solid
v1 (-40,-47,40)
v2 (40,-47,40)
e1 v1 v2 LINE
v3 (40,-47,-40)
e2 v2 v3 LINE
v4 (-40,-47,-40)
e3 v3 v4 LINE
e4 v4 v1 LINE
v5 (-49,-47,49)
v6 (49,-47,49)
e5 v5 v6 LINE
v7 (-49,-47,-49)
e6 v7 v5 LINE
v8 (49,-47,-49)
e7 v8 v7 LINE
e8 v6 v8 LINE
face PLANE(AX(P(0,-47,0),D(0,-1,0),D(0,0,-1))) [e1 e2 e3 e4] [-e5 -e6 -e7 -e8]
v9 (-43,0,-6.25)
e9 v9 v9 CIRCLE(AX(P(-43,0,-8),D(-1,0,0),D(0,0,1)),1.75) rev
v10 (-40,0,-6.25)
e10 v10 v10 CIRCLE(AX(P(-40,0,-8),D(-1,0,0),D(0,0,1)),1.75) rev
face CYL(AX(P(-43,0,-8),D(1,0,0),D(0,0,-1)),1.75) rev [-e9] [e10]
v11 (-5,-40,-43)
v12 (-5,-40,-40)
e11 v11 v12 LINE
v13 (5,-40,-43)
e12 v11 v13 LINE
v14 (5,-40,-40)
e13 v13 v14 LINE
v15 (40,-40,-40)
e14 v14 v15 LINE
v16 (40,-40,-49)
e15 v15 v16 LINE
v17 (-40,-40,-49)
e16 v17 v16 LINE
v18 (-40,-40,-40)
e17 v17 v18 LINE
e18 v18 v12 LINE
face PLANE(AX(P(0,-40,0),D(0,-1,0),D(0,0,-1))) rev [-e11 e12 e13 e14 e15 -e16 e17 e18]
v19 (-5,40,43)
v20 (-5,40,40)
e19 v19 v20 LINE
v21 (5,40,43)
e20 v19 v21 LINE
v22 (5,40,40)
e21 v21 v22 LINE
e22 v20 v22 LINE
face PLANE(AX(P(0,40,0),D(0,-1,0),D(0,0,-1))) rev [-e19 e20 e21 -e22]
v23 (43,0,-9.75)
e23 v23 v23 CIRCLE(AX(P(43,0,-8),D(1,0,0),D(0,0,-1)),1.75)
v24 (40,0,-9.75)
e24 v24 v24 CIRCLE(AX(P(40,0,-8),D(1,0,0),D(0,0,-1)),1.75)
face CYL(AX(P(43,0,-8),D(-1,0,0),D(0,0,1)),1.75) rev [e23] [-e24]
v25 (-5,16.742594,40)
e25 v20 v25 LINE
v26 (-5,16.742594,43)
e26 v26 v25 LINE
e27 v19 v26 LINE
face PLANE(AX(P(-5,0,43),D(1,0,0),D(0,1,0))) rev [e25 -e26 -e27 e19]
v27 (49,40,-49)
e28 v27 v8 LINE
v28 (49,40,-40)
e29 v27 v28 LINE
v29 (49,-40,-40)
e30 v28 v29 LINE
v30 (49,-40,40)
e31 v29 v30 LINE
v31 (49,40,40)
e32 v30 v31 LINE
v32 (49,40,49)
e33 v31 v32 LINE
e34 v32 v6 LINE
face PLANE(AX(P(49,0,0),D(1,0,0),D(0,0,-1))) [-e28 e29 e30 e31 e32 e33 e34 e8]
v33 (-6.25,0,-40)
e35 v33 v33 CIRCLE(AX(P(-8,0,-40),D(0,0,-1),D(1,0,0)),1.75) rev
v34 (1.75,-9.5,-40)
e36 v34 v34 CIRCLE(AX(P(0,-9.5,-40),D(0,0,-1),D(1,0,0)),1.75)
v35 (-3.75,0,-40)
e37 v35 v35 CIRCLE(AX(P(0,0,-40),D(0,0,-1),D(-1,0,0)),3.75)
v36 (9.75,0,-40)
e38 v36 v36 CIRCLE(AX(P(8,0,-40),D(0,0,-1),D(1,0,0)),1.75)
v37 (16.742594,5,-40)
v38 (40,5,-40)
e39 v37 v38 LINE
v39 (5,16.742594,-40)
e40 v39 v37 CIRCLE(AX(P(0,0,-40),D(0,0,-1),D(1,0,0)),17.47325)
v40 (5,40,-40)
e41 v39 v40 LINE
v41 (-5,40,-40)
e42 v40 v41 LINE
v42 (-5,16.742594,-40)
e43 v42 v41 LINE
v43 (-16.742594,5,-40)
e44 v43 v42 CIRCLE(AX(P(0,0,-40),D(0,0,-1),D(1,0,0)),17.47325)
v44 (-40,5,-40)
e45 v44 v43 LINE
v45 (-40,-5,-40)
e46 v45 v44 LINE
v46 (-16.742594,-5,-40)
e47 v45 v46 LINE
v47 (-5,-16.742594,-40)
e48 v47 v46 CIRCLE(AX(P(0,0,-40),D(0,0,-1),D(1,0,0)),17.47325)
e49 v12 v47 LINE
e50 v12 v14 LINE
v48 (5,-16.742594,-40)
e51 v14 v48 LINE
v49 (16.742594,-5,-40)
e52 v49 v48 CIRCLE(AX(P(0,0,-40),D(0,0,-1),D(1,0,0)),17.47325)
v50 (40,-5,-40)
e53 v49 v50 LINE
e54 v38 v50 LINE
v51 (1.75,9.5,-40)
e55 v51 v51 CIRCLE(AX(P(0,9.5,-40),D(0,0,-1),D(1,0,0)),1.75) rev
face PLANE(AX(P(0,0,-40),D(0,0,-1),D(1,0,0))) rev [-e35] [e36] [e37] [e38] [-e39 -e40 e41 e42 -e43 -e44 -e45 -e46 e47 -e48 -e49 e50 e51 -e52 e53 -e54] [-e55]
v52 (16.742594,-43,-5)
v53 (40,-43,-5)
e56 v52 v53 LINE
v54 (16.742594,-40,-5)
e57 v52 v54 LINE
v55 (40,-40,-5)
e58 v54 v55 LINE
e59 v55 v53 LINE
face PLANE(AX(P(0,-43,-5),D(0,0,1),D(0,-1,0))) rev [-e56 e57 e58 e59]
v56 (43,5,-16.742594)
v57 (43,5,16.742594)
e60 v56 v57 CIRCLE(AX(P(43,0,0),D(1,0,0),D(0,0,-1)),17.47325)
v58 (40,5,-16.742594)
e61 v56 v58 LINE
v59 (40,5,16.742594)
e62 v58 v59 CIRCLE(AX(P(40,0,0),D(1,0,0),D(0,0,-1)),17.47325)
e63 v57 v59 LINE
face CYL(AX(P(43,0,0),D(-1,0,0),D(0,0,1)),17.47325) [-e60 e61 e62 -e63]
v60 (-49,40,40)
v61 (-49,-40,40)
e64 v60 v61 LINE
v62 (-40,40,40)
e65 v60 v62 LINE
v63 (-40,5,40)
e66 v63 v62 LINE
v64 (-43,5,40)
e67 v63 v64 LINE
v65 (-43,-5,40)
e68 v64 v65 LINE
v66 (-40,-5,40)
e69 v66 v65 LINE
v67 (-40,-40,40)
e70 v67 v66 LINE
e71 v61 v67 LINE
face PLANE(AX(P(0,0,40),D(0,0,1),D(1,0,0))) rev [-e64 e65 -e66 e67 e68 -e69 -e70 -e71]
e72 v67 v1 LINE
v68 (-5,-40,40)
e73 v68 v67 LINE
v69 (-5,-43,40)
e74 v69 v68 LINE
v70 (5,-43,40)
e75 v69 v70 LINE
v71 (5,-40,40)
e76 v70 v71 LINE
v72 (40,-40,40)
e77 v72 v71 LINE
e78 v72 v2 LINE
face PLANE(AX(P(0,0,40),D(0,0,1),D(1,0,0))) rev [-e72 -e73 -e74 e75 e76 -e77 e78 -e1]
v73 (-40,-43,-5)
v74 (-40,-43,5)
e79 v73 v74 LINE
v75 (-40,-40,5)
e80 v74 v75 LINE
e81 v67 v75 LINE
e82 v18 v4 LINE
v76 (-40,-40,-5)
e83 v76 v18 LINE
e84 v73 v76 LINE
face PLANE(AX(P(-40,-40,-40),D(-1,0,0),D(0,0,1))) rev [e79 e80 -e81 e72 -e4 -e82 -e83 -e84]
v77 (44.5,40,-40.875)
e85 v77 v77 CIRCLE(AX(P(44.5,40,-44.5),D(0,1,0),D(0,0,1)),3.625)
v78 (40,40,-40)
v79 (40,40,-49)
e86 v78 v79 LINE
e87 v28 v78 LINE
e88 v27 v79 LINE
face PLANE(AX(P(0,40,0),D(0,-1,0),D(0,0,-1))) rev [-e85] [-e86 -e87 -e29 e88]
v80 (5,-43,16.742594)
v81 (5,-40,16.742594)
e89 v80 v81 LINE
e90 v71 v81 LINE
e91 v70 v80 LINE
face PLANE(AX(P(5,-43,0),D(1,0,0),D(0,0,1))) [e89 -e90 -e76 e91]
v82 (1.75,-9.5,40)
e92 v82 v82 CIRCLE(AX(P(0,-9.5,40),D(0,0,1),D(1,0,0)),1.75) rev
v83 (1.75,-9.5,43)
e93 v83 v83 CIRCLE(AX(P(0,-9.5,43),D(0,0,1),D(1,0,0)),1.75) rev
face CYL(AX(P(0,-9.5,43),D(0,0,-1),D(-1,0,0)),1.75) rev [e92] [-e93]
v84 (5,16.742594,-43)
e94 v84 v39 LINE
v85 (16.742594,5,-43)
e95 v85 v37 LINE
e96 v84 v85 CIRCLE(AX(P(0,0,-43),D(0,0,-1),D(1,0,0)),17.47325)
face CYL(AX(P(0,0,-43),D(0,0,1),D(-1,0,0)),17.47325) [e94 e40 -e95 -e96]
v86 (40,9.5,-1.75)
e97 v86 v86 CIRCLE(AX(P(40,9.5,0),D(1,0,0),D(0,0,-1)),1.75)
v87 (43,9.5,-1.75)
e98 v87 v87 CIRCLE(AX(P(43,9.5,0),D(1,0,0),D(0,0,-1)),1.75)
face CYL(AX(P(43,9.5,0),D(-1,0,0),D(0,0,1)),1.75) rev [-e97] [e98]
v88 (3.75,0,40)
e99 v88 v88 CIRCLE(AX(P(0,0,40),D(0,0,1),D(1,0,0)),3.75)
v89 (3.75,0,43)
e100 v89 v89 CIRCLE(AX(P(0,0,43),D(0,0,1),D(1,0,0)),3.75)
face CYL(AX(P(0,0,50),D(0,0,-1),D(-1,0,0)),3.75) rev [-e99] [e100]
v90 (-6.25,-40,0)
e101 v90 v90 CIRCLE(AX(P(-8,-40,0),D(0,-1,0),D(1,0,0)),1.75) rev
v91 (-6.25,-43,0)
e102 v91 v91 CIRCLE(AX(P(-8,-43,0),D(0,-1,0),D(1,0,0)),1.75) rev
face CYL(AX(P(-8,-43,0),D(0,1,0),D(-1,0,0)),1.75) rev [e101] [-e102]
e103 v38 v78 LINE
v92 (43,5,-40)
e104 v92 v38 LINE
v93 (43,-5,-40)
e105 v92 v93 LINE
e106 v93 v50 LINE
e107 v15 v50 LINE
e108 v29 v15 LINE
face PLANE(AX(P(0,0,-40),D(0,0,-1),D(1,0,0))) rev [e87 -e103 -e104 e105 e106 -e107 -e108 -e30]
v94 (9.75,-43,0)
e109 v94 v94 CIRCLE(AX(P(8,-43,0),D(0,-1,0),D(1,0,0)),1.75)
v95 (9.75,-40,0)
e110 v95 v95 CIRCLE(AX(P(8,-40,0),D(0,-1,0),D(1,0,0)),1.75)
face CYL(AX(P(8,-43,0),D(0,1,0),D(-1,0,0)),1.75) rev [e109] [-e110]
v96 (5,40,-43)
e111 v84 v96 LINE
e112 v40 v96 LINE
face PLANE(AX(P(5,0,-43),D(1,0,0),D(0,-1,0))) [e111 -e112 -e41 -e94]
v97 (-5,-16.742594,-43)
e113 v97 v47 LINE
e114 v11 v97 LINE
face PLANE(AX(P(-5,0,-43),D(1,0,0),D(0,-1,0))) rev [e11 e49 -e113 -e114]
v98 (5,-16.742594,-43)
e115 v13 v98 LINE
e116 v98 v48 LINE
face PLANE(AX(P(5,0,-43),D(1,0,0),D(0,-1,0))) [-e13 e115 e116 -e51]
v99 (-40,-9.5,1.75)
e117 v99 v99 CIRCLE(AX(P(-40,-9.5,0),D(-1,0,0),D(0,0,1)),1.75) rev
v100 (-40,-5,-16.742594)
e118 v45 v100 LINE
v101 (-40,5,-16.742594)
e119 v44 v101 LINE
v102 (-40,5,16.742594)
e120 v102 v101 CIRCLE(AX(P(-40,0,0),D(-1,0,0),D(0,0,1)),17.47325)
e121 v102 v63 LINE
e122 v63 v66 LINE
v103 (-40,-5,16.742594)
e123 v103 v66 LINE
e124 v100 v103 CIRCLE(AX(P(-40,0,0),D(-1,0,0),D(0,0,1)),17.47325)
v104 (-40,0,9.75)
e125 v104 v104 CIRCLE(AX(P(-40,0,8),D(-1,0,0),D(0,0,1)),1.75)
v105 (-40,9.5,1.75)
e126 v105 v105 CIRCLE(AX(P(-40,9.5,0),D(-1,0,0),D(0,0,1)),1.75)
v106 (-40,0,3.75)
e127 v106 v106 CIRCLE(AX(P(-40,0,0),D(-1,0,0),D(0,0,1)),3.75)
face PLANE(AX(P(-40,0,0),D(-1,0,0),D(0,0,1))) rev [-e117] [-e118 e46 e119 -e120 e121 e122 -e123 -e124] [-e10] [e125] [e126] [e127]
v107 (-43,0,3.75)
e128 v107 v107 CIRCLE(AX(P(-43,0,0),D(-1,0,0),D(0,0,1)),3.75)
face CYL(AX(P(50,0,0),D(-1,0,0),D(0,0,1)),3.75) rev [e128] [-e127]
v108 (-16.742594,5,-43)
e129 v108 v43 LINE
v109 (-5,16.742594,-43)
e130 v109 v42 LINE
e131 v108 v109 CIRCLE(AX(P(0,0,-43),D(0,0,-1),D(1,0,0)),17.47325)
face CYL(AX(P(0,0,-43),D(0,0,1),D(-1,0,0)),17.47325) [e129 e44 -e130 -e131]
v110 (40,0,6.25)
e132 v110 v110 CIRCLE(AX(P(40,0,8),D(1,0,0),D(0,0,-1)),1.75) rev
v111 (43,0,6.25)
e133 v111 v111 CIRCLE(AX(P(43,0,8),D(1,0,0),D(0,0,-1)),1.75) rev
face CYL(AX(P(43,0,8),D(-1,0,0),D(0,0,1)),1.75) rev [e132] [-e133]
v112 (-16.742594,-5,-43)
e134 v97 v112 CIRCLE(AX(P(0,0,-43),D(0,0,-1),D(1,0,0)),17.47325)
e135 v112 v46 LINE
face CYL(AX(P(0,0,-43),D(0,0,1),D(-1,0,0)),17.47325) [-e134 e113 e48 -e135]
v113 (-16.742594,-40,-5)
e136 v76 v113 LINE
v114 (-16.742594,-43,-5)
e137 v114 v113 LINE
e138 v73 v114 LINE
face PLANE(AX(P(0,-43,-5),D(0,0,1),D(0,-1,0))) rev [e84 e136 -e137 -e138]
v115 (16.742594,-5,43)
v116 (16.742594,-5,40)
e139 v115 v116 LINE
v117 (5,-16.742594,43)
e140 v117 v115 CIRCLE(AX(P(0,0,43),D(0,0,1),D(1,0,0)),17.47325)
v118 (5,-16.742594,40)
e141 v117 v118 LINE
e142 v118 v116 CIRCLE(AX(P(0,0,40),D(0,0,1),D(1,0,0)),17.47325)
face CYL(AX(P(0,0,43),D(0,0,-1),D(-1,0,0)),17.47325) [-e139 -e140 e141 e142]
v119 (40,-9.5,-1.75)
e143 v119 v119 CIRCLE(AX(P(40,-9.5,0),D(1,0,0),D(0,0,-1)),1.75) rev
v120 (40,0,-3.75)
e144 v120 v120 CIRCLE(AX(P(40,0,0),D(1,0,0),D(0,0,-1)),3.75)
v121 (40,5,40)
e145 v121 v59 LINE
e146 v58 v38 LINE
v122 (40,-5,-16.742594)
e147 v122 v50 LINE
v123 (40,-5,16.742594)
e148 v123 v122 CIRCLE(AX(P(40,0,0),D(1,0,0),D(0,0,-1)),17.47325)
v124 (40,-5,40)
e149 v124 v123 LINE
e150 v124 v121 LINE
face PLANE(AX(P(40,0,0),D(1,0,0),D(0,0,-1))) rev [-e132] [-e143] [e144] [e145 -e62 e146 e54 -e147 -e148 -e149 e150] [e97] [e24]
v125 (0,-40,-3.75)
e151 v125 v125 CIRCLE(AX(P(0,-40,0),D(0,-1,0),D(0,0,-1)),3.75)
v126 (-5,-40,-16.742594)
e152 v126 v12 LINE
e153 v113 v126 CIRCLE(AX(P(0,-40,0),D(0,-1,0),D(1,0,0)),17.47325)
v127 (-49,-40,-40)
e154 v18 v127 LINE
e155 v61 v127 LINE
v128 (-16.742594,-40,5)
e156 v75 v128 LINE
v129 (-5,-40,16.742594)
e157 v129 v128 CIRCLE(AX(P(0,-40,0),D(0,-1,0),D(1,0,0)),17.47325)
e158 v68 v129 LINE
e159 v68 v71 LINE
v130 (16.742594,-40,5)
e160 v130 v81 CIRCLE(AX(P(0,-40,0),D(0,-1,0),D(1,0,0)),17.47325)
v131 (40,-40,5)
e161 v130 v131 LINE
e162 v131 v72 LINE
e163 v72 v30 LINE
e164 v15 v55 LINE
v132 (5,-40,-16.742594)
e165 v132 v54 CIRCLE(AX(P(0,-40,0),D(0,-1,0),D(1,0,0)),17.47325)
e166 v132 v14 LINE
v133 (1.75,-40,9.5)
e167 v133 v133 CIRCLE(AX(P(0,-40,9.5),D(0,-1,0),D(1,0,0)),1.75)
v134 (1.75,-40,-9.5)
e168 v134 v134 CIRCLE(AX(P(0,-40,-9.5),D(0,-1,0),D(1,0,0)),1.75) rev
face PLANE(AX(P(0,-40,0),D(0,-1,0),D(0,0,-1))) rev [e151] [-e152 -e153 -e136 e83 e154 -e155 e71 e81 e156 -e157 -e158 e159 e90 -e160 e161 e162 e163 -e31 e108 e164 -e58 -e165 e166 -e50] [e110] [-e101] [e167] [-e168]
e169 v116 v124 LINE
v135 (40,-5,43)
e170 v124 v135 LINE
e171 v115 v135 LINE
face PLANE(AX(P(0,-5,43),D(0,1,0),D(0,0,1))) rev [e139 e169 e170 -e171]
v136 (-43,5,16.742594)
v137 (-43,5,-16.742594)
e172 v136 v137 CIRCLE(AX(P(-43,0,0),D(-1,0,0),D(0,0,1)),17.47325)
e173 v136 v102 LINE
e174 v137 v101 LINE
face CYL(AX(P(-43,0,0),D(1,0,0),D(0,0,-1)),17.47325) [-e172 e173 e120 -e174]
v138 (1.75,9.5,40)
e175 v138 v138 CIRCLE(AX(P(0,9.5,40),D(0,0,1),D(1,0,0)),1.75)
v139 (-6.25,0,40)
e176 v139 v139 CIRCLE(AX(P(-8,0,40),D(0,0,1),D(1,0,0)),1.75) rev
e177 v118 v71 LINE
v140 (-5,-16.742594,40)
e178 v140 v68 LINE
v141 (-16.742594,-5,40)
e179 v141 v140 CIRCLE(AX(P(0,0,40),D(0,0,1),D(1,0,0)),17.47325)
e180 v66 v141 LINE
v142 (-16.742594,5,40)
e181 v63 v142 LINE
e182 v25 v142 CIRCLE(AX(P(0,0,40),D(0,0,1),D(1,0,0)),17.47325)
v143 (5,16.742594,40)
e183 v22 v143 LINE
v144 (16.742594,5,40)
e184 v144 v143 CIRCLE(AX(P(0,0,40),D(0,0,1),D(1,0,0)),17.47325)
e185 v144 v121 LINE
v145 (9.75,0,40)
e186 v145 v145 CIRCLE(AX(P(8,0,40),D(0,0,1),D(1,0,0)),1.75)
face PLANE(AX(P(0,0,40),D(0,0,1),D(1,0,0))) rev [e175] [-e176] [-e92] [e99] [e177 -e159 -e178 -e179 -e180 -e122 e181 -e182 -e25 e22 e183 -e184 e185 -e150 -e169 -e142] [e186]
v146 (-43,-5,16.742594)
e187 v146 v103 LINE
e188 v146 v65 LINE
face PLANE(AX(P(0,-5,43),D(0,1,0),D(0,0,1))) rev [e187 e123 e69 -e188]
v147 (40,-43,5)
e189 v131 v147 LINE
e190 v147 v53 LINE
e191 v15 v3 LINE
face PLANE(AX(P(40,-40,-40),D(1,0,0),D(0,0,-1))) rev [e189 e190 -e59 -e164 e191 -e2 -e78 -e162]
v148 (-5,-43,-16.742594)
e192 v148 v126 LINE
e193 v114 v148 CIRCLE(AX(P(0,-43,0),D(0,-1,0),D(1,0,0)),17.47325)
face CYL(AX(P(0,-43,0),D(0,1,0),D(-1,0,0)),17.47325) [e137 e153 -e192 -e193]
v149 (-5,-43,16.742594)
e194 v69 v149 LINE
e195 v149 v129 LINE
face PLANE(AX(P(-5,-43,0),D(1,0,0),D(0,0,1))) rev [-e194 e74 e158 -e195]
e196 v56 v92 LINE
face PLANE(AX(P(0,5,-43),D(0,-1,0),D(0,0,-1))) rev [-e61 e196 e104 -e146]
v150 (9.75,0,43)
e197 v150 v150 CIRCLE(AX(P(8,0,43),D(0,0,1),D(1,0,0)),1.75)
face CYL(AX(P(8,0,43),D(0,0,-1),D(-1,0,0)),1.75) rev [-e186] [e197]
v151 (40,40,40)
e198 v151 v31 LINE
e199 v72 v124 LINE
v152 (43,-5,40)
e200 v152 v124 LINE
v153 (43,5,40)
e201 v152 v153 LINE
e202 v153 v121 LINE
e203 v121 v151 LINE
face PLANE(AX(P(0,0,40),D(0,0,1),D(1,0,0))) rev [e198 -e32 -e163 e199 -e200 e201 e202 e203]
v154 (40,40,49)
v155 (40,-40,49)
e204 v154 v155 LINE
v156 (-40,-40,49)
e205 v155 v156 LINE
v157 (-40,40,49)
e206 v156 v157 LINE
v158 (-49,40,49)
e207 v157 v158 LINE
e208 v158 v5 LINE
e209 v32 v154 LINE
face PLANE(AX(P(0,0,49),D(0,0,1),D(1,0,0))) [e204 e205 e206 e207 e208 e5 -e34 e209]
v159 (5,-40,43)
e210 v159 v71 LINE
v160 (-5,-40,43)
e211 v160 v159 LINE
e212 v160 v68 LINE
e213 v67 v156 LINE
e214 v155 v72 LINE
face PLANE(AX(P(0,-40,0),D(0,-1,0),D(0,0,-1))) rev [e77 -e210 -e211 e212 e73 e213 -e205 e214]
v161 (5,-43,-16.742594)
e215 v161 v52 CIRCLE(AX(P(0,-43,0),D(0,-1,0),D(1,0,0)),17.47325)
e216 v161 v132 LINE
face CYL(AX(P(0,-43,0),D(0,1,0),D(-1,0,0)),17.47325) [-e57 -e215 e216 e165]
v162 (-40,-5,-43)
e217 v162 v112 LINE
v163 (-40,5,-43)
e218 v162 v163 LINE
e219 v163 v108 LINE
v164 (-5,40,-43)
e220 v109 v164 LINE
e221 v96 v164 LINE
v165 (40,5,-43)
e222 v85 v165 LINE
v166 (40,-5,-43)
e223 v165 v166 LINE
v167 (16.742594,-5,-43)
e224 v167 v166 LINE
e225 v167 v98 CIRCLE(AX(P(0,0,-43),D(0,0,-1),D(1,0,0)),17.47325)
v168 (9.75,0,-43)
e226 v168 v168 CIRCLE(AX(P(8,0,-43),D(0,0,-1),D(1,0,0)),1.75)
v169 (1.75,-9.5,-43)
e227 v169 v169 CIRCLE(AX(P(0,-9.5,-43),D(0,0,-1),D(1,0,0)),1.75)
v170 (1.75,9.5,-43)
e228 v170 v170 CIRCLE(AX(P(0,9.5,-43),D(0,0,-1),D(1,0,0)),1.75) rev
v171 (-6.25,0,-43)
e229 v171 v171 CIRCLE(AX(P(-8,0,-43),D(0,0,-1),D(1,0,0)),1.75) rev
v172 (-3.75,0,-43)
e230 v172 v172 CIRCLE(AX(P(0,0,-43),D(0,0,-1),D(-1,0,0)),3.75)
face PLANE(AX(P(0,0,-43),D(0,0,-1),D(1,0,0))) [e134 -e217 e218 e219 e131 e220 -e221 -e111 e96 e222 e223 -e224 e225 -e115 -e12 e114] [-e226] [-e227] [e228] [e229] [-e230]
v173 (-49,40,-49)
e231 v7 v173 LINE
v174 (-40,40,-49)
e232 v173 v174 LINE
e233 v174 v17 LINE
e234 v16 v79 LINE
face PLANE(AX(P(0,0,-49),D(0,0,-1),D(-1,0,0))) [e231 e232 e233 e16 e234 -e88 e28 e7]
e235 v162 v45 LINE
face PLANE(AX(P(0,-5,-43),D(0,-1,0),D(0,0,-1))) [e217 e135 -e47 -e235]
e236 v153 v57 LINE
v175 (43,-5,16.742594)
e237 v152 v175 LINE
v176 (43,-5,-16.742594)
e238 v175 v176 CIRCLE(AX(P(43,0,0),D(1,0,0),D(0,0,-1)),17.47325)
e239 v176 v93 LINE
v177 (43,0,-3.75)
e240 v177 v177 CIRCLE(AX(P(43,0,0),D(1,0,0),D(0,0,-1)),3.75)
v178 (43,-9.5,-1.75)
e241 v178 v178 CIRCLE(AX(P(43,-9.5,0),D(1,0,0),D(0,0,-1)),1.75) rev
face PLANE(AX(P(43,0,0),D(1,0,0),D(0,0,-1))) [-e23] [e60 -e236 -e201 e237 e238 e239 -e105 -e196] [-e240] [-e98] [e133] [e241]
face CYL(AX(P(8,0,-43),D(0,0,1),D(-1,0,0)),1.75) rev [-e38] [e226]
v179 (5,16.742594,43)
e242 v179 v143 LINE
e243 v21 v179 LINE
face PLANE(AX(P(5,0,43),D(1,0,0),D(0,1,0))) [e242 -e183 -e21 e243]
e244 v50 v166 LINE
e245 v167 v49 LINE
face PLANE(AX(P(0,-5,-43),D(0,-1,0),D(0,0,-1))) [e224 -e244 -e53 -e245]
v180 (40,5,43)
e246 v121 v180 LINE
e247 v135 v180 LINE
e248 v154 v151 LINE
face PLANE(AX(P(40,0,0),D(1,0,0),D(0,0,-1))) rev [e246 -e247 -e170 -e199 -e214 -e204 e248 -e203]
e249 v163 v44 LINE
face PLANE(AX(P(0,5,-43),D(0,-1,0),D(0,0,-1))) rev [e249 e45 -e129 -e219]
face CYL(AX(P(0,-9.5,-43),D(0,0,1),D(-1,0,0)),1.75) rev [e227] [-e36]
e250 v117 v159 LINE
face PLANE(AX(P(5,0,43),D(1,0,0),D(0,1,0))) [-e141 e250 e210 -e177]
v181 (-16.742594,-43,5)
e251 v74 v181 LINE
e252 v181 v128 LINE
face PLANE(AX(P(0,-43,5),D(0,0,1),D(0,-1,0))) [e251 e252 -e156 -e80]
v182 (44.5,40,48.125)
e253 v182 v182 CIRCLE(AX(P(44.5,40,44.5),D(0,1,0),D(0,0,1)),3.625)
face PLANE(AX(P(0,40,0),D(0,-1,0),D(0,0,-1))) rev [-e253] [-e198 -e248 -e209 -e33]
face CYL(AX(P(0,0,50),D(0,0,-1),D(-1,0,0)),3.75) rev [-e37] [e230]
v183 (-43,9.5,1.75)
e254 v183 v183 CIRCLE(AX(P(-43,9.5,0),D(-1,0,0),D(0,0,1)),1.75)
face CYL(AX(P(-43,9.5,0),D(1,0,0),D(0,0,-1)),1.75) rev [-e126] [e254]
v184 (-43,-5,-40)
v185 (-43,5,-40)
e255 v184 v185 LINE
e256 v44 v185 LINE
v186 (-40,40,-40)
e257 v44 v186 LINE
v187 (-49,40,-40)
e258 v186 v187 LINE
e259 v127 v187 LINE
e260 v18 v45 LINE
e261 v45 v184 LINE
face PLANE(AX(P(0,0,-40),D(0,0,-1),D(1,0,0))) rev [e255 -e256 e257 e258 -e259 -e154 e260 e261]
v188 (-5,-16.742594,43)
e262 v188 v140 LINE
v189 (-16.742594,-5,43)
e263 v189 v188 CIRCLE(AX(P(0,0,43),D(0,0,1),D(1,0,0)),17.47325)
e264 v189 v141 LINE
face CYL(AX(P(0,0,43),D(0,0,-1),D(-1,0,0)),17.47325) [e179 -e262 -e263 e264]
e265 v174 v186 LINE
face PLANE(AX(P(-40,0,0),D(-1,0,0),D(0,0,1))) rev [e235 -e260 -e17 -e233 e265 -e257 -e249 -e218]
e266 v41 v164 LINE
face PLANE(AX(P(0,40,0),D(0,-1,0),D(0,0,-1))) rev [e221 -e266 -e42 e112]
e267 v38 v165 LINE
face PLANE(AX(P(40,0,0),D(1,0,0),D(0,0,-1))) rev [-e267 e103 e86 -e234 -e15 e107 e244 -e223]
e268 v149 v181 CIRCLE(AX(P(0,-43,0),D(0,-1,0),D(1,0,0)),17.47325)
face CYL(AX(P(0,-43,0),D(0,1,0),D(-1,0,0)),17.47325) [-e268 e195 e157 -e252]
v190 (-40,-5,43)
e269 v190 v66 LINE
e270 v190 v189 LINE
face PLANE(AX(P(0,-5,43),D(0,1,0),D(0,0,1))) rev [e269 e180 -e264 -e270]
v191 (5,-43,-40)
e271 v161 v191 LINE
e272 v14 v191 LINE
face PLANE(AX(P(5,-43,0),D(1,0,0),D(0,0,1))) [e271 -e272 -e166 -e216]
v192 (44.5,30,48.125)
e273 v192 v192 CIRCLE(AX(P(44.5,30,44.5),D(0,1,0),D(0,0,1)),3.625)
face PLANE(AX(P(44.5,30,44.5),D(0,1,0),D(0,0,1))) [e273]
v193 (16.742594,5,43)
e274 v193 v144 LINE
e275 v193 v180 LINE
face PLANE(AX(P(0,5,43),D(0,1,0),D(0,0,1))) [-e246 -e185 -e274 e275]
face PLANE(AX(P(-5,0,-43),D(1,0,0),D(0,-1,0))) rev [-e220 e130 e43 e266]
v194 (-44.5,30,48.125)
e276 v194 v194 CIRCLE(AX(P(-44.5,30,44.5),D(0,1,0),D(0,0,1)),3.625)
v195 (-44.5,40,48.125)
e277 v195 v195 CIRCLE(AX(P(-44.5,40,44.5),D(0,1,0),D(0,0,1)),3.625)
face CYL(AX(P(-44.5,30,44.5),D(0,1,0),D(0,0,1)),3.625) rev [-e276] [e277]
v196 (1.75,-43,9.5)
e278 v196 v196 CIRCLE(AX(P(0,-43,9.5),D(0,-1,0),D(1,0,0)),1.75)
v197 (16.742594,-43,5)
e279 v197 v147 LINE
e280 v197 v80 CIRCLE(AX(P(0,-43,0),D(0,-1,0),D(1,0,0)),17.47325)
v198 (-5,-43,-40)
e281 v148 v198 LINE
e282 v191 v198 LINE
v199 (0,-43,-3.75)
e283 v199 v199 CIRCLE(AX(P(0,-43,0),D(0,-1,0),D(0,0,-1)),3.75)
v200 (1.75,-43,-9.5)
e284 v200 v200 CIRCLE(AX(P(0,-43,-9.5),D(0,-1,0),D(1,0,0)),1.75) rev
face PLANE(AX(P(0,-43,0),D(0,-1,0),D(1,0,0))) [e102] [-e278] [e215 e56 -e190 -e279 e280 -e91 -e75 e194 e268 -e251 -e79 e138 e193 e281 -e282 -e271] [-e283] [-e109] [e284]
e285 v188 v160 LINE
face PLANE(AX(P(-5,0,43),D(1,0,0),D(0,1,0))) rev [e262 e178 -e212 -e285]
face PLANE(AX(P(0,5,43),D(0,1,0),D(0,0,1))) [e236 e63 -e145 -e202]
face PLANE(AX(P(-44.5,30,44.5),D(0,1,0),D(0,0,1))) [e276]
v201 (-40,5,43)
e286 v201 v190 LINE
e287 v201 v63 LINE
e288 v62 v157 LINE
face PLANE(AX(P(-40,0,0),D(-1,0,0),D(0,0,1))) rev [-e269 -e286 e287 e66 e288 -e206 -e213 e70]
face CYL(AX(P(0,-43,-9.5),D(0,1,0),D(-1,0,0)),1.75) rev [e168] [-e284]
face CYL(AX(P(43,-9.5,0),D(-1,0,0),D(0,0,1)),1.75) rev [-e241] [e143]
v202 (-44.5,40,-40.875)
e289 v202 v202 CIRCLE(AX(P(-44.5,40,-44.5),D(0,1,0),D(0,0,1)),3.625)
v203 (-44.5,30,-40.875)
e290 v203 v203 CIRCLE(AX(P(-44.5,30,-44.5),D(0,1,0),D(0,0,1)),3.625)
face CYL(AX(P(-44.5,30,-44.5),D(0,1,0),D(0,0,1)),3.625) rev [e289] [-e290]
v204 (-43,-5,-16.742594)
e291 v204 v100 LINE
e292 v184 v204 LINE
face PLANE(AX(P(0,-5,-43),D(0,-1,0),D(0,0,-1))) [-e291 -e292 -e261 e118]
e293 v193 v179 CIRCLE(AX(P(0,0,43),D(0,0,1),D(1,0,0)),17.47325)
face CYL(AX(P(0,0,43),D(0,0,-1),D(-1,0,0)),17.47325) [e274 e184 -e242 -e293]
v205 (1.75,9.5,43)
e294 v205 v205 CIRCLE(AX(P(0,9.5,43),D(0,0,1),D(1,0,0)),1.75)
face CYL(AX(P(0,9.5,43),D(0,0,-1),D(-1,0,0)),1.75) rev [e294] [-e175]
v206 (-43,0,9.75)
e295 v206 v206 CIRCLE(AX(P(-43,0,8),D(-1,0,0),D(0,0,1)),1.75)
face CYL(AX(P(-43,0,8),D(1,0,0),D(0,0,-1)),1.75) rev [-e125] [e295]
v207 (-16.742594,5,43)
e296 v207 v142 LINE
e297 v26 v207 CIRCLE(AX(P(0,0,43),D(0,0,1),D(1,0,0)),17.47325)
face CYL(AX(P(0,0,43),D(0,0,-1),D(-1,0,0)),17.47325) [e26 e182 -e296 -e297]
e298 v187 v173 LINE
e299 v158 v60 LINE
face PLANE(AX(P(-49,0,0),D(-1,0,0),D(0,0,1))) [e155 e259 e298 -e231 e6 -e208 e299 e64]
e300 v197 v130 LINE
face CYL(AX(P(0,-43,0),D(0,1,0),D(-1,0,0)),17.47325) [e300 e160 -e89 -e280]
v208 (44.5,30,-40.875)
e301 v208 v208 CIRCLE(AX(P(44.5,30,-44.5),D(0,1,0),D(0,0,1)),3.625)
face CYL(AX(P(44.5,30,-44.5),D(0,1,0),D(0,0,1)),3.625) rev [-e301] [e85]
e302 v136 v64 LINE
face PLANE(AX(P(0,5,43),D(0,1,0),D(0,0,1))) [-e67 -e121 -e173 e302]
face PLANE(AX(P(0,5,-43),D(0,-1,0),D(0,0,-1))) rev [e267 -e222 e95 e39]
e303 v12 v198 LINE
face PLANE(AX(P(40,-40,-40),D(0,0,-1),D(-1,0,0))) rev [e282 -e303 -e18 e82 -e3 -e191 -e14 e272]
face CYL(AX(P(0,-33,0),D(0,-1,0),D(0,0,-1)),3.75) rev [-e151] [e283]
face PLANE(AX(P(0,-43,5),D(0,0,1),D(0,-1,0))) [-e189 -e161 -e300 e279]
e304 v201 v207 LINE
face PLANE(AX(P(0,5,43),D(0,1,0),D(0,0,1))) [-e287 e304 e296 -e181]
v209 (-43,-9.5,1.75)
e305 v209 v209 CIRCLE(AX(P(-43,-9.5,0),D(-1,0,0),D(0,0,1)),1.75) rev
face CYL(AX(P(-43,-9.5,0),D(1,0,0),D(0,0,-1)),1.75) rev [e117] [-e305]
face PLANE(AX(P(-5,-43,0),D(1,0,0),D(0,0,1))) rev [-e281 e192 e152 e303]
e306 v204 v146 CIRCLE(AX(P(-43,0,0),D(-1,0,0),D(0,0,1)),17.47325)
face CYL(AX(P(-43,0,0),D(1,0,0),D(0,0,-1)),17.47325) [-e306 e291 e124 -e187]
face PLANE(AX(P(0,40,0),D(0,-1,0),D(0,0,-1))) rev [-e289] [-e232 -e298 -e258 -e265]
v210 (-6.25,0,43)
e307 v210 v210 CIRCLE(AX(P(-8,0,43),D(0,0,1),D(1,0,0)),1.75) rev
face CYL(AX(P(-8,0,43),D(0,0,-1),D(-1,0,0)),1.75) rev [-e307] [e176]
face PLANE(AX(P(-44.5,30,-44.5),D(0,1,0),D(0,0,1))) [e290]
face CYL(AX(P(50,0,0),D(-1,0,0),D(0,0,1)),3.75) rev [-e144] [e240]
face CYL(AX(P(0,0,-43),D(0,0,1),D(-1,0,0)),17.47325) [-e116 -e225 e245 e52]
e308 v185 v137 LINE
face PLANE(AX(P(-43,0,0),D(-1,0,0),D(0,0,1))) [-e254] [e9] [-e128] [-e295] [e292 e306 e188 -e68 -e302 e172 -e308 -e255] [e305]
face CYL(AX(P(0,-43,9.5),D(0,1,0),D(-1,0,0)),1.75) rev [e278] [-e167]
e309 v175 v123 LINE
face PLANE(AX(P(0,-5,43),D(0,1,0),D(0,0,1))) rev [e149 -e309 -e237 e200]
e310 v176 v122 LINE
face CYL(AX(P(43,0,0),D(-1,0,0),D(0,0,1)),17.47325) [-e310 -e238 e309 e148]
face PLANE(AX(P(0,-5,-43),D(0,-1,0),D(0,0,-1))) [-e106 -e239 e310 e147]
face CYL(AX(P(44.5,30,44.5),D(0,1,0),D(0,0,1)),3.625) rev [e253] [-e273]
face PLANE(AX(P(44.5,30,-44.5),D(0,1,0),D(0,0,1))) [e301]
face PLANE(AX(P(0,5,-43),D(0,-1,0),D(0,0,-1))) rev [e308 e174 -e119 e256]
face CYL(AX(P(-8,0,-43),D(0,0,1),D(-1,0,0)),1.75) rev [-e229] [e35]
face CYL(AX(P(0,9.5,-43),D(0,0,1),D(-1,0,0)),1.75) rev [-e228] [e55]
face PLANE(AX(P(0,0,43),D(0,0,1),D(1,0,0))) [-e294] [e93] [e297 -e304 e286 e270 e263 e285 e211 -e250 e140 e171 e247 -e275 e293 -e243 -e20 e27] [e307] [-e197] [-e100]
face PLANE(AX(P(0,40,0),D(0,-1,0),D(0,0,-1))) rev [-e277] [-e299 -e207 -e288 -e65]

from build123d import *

# Parameters (mm, degrees)
SKETCH2_R                  = 1.75
SKETCH2_W                  = 10
SKETCH2_H                  = 10
BOSS_EXTRUDE1_DEPTH        = 3
CIRPATTERN1_COUNT          = 4
CIRPATTERN2_START          = 40
CIRPATTERN2_OUTLINE_R      = 1.75
CIRPATTERN2_DEPTH          = 3
CIRPATTERN2_START_2        = -43
CIRPATTERN2_2_OUTLINE_R    = 1.75
CIRPATTERN2_2_DEPTH        = 3
CIRPATTERN2_3_OUTLINE_R    = 1.75
CIRPATTERN2_3_DEPTH        = 3
CIRPATTERN2_4_OUTLINE_R    = 1.75
CIRPATTERN2_4_DEPTH        = 3
BOSS_EXTRUDE2_DEPTH        = 50
BOSS_EXTRUDE2_DEPTH_BACK   = 50
SKETCH3_W                  = 10
SKETCH3_H                  = 10
BOSS_EXTRUDE2_2_DEPTH      = 50
BOSS_EXTRUDE2_2_DEPTH_BACK = 50
BOSS_EXTRUDE2_3_DEPTH      = 50
BOSS_EXTRUDE2_3_DEPTH_BACK = 50
BOSS_EXTRUDE2_4_DEPTH      = 50
BOSS_EXTRUDE2_4_DEPTH_BACK = 50
SKETCH4_W                  = 100
SKETCH4_H                  = 100
SKETCH4_W_2                = 80
SKETCH4_H_2                = 80
BOSS_EXTRUDE3_DEPTH        = 10
SKETCH5_W                  = 100
SKETCH5_H                  = 100
SKETCH5_W_2                = 80
SKETCH5_H_2                = 80
BOSS_EXTRUDE4_DEPTH        = 10
SKETCH7_R                  = 3.75
CUT_EXTRUDE2_DEPTH         = 10
SKETCH8_R                  = 3.75
CUT_EXTRUDE3_DEPTH         = 117.828934772
SKETCH9_R                  = 3.75
CUT_EXTRUDE4_DEPTH         = 117.828934772
SKETCH10_W                 = 100
SKETCH10_H                 = 100
CUT_EXTRUDE5_DEPTH         = 3
SKETCH11_W                 = 100
SKETCH11_H                 = 97
CUT_EXTRUDE6_DEPTH         = 1
SKETCH12_W                 = 99
SKETCH12_H                 = 97
CUT_EXTRUDE7_DEPTH         = 1
SKETCH13_W                 = 99
SKETCH13_H                 = 97
CUT_EXTRUDE8_DEPTH         = 1
SKETCH14_W                 = 98
SKETCH14_H                 = 97
CUT_EXTRUDE9_DEPTH         = 1
SKETCH16_W                 = 98
SKETCH16_H                 = 98
CUT_EXTRUDE10_DEPTH        = 10
SKETCH17_R                 = 3.625
CUT_EXTRUDE11_DEPTH        = 10
CUT_EXTRUDE14_DEPTH        = 115.341593482


# Read off the part's stored shape, not the designer's step: CirPattern2
with BuildPart() as part:
    # Sketch2 → Boss-Extrude1 (new body)
    # profile 1 of 13: a face of its own
    with BuildSketch(Plane.XY.offset(40)):
        with BuildLine():
            ThreePointArc((5, -16.74259435), (0, -17.47325), (-5, -16.74259435))
            Line((-5, -16.74259435), (-5, -50))
            Line((-5, -50), (5, -50))
            Line((5, -50), (5, -16.74259435))
        make_face()
    # profile 2 of 13: a face of its own
    with BuildSketch(Plane.XY.offset(40)):
        with BuildLine():
            Line((5, -5), (-5, -5))
            Line((-5, -5), (-5, -16.74259435))
            ThreePointArc((-5, -16.74259435), (0, -17.47325), (5, -16.74259435))
            Line((5, -16.74259435), (5, -5))
        make_face()
        with Locations((0, -9.5)):
            Circle(SKETCH2_R, mode=Mode.SUBTRACT)
    # profile 3 of 13: a face of its own
    with BuildSketch(Plane.XY.offset(40)):
        with BuildLine():
            Line((16.74259435, -5), (5, -5))
            Line((5, -5), (5, -16.74259435))
            ThreePointArc((5, -16.74259435), (12.355453564, -12.355453564), (16.74259435, -5))
        make_face()
    # profile 4 of 13: a face of its own
    with BuildSketch(Plane.XY.offset(40)):
        with BuildLine():
            Line((5, 5), (5, -5))
            Line((5, -5), (16.74259435, -5))
            ThreePointArc((16.74259435, -5), (17.289621197, -2.526551883), (17.47325, 0))
            ThreePointArc((17.47325, 0), (17.289621197, 2.526551883), (16.74259435, 5))
            Line((16.74259435, 5), (5, 5))
        make_face()
        with Locations((8, 0)):
            Circle(SKETCH2_R, mode=Mode.SUBTRACT)
    # profile 5 of 13: a face of its own
    with BuildSketch(Plane.XY.offset(40)):
        Rectangle(SKETCH2_W, SKETCH2_H)
    # profile 6 of 13: a face of its own
    with BuildSketch(Plane.XY.offset(40)):
        with BuildLine():
            Line((-5, -5), (-16.74259435, -5))
            ThreePointArc((-16.74259435, -5), (-12.355453564, -12.355453564), (-5, -16.74259435))
            Line((-5, -16.74259435), (-5, -5))
        make_face()
    # profile 7 of 13: a face of its own
    with BuildSketch(Plane.XY.offset(40)):
        with BuildLine():
            ThreePointArc((-16.74259435, 5), (-17.47325, 0), (-16.74259435, -5))
            Line((-16.74259435, -5), (-5, -5))
            Line((-5, -5), (-5, 5))
            Line((-5, 5), (-16.74259435, 5))
        make_face()
        with Locations((-8, 0)):
            Circle(SKETCH2_R, mode=Mode.SUBTRACT)
    # profile 8 of 13: a face of its own
    with BuildSketch(Plane.XY.offset(40)):
        with BuildLine():
            ThreePointArc((-5, 16.74259435), (-12.355453564, 12.355453564), (-16.74259435, 5))
            Line((-16.74259435, 5), (-5, 5))
            Line((-5, 5), (-5, 16.74259435))
        make_face()
    # profile 9 of 13: a face of its own
    with BuildSketch(Plane.XY.offset(40)):
        with BuildLine():
            Line((-5, 16.74259435), (-5, 5))
            Line((-5, 5), (5, 5))
            Line((5, 5), (5, 16.74259435))
            ThreePointArc((5, 16.74259435), (0, 17.47325), (-5, 16.74259435))
        make_face()
        with Locations((0, 9.5)):
            Circle(SKETCH2_R, mode=Mode.SUBTRACT)
    # profile 10 of 13: a face of its own
    with BuildSketch(Plane.XY.offset(40)):
        with BuildLine():
            Line((5, 16.74259435), (5, 5))
            Line((5, 5), (16.74259435, 5))
            ThreePointArc((16.74259435, 5), (12.355453564, 12.355453564), (5, 16.74259435))
        make_face()
    # profile 11 of 13: a face of its own
    with BuildSketch(Plane.XY.offset(40)):
        with BuildLine():
            ThreePointArc((17.47325, 0), (17.289621197, -2.526551883), (16.74259435, -5))
            Line((16.74259435, -5), (50, -5))
            Line((50, -5), (50, 5))
            Line((50, 5), (16.74259435, 5))
            ThreePointArc((16.74259435, 5), (17.289621197, 2.526551883), (17.47325, 0))
        make_face()
    # profile 12 of 13: a face of its own
    with BuildSketch(Plane.XY.offset(40)):
        with BuildLine():
            Line((-50, 5), (-50, -5))
            Line((-50, -5), (-16.74259435, -5))
            ThreePointArc((-16.74259435, -5), (-17.47325, 0), (-16.74259435, 5))
            Line((-16.74259435, 5), (-50, 5))
        make_face()
    # profile 13 of 13: a face of its own
    with BuildSketch(Plane.XY.offset(40)):
        with BuildLine():
            Line((-5, 50), (-5, 16.74259435))
            ThreePointArc((-5, 16.74259435), (0, 17.47325), (5, 16.74259435))
            Line((5, 16.74259435), (5, 50))
            Line((5, 50), (-5, 50))
        make_face()
    extrude(amount=BOSS_EXTRUDE1_DEPTH)


with BuildPart() as cirpattern1_1:
    # CirPattern1: pattern copy
    add(part.part.rotate(Axis((0, 0, 0), (1, 0, 0)), 1 * 360 / CIRPATTERN1_COUNT))


with BuildPart() as cirpattern1_2:
    # CirPattern1: pattern copy
    add(part.part.rotate(Axis((0, 0, 0), (1, 0, 0)), 2 * 360 / CIRPATTERN1_COUNT))


with BuildPart() as cirpattern1_3:
    # CirPattern1: pattern copy
    add(part.part.rotate(Axis((0, 0, 0), (1, 0, 0)), 3 * 360 / CIRPATTERN1_COUNT))


with BuildPart() as body_5:
    # CirPattern2 outline → CirPattern2 (new body)
    with BuildSketch(Plane.XY.offset(CIRPATTERN2_START)):
        with BuildLine():
            ThreePointArc((5, -16.74259435), (12.355453564, -12.355453564), (16.74259435, -5))
            Line((16.74259435, -5), (50, -5))
            Line((50, -5), (50, 5))
            Line((50, 5), (16.74259435, 5))
            ThreePointArc((16.74259435, 5), (12.355453564, 12.355453564), (5, 16.74259435))
            Line((5, 16.74259435), (5, 50))
            Line((5, 50), (-5, 50))
            Line((-5, 50), (-5, 16.74259435))
            ThreePointArc((-5, 16.74259435), (-12.355453564, 12.355453564), (-16.74259435, 5))
            Line((-16.74259435, 5), (-50, 5))
            Line((-50, 5), (-50, -5))
            Line((-50, -5), (-16.74259435, -5))
            ThreePointArc((-16.74259435, -5), (-12.355453564, -12.355453564), (-5, -16.74259435))
            Line((-5, -16.74259435), (-5, -50))
            Line((-5, -50), (5, -50))
            Line((5, -50), (5, -16.74259435))
        make_face()
        with Locations((0, -9.5)):
            Circle(CIRPATTERN2_OUTLINE_R, mode=Mode.SUBTRACT)
        with Locations((-8, 0)):
            Circle(CIRPATTERN2_OUTLINE_R, mode=Mode.SUBTRACT)
        with Locations((8, 0)):
            Circle(CIRPATTERN2_OUTLINE_R, mode=Mode.SUBTRACT)
        with Locations((0, 9.5)):
            Circle(CIRPATTERN2_OUTLINE_R, mode=Mode.SUBTRACT)
    extrude(amount=CIRPATTERN2_DEPTH)


with BuildPart() as body_6:
    # CirPattern2 2 outline → CirPattern2 2 (new body)
    with BuildSketch(Plane.YZ.offset(CIRPATTERN2_START_2)):
        with BuildLine():
            Line((-5, 50), (-5, 16.74259435))
            ThreePointArc((-5, 16.74259435), (-12.355453564, 12.355453564), (-16.74259435, 5))
            Line((-16.74259435, 5), (-50, 5))
            Line((-50, 5), (-50, -5))
            Line((-50, -5), (-16.74259435, -5))
            ThreePointArc((-16.74259435, -5), (-12.355453564, -12.355453564), (-5, -16.74259435))
            Line((-5, -16.74259435), (-5, -50))
            Line((-5, -50), (5, -50))
            Line((5, -50), (5, -16.74259435))
            ThreePointArc((5, -16.74259435), (12.355453564, -12.355453564), (16.74259435, -5))
            Line((16.74259435, -5), (50, -5))
            Line((50, -5), (50, 5))
            Line((50, 5), (16.74259435, 5))
            ThreePointArc((16.74259435, 5), (12.355453564, 12.355453564), (5, 16.74259435))
            Line((5, 16.74259435), (5, 50))
            Line((5, 50), (-5, 50))
        make_face()
        with Locations((0, -8)):
            Circle(CIRPATTERN2_2_OUTLINE_R, mode=Mode.SUBTRACT)
        with Locations((-9.5, 0)):
            Circle(CIRPATTERN2_2_OUTLINE_R, mode=Mode.SUBTRACT)
        with Locations((9.5, 0)):
            Circle(CIRPATTERN2_2_OUTLINE_R, mode=Mode.SUBTRACT)
        with Locations((0, 8)):
            Circle(CIRPATTERN2_2_OUTLINE_R, mode=Mode.SUBTRACT)
    extrude(amount=CIRPATTERN2_2_DEPTH)


with BuildPart() as body_7:
    # CirPattern2 3 outline → CirPattern2 3 (new body)
    with BuildSketch(Plane.YZ.offset(CIRPATTERN2_START)):
        with BuildLine():
            ThreePointArc((-16.74259435, -5), (-12.355453564, -12.355453564), (-5, -16.74259435))
            Line((-5, -16.74259435), (-5, -50))
            Line((-5, -50), (5, -50))
            Line((5, -50), (5, -16.74259435))
            ThreePointArc((5, -16.74259435), (12.355453564, -12.355453564), (16.74259435, -5))
            Line((16.74259435, -5), (50, -5))
            Line((50, -5), (50, 5))
            Line((50, 5), (16.74259435, 5))
            ThreePointArc((16.74259435, 5), (12.355453564, 12.355453564), (5, 16.74259435))
            Line((5, 16.74259435), (5, 50))
            Line((5, 50), (-5, 50))
            Line((-5, 50), (-5, 16.74259435))
            ThreePointArc((-5, 16.74259435), (-12.355453564, 12.355453564), (-16.74259435, 5))
            Line((-16.74259435, 5), (-50, 5))
            Line((-50, 5), (-50, -5))
            Line((-50, -5), (-16.74259435, -5))
        make_face()
        with Locations((0, -8)):
            Circle(CIRPATTERN2_3_OUTLINE_R, mode=Mode.SUBTRACT)
        with Locations((-9.5, 0)):
            Circle(CIRPATTERN2_3_OUTLINE_R, mode=Mode.SUBTRACT)
        with Locations((9.5, 0)):
            Circle(CIRPATTERN2_3_OUTLINE_R, mode=Mode.SUBTRACT)
        with Locations((0, 8)):
            Circle(CIRPATTERN2_3_OUTLINE_R, mode=Mode.SUBTRACT)
    extrude(amount=CIRPATTERN2_3_DEPTH)


with BuildPart() as body_8:
    # CirPattern2 4 outline → CirPattern2 4 (new body)
    with BuildSketch(Plane.XY.offset(CIRPATTERN2_START_2)):
        with BuildLine():
            Line((50, 5), (16.74259435, 5))
            ThreePointArc((16.74259435, 5), (12.355453564, 12.355453564), (5, 16.74259435))
            Line((5, 16.74259435), (5, 50))
            Line((5, 50), (-5, 50))
            Line((-5, 50), (-5, 16.74259435))
            ThreePointArc((-5, 16.74259435), (-12.355453564, 12.355453564), (-16.74259435, 5))
            Line((-16.74259435, 5), (-50, 5))
            Line((-50, 5), (-50, -5))
            Line((-50, -5), (-16.74259435, -5))
            ThreePointArc((-16.74259435, -5), (-12.355453564, -12.355453564), (-5, -16.74259435))
            Line((-5, -16.74259435), (-5, -50))
            Line((-5, -50), (5, -50))
            Line((5, -50), (5, -16.74259435))
            ThreePointArc((5, -16.74259435), (12.355453564, -12.355453564), (16.74259435, -5))
            Line((16.74259435, -5), (50, -5))
            Line((50, -5), (50, 5))
        make_face()
        with Locations((0, -9.5)):
            Circle(CIRPATTERN2_4_OUTLINE_R, mode=Mode.SUBTRACT)
        with Locations((-8, 0)):
            Circle(CIRPATTERN2_4_OUTLINE_R, mode=Mode.SUBTRACT)
        with Locations((8, 0)):
            Circle(CIRPATTERN2_4_OUTLINE_R, mode=Mode.SUBTRACT)
        with Locations((0, 9.5)):
            Circle(CIRPATTERN2_4_OUTLINE_R, mode=Mode.SUBTRACT)
    extrude(amount=CIRPATTERN2_4_DEPTH)


with BuildPart() as body_9:
    # Sketch3 → Boss-Extrude2 (new, two sides: drawn at the far end of the back side and taken through both)
    with BuildSketch(Plane(origin=(0, 0, 0), x_dir=(1, 0, 0), z_dir=(0, 1, 0)).offset(-BOSS_EXTRUDE2_DEPTH_BACK)):
        with Locations((-45, -45)):
            Rectangle(SKETCH3_W, SKETCH3_H)
    extrude(amount=BOSS_EXTRUDE2_DEPTH + BOSS_EXTRUDE2_DEPTH_BACK)


with BuildPart() as body_10:
    # Sketch3 → Boss-Extrude2 2 (new, two sides: drawn at the far end of the back side and taken through both)
    with BuildSketch(Plane(origin=(0, 0, 0), x_dir=(1, 0, 0), z_dir=(0, 1, 0)).offset(-BOSS_EXTRUDE2_2_DEPTH_BACK)):
        with Locations((45, -45)):
            Rectangle(SKETCH3_W, SKETCH3_H)
    extrude(amount=BOSS_EXTRUDE2_2_DEPTH + BOSS_EXTRUDE2_2_DEPTH_BACK)


with BuildPart() as body_11:
    # Sketch3 → Boss-Extrude2 3 (new, two sides: drawn at the far end of the back side and taken through both)
    with BuildSketch(Plane(origin=(0, 0, 0), x_dir=(1, 0, 0), z_dir=(0, 1, 0)).offset(-BOSS_EXTRUDE2_3_DEPTH_BACK)):
        with Locations((45, 45)):
            Rectangle(SKETCH3_W, SKETCH3_H)
    extrude(amount=BOSS_EXTRUDE2_3_DEPTH + BOSS_EXTRUDE2_3_DEPTH_BACK)


with BuildPart() as body_12:
    # Sketch3 → Boss-Extrude2 4 (new, two sides: drawn at the far end of the back side and taken through both)
    with BuildSketch(Plane(origin=(0, 0, 0), x_dir=(1, 0, 0), z_dir=(0, 1, 0)).offset(-BOSS_EXTRUDE2_4_DEPTH_BACK)):
        with Locations((-45, 45)):
            Rectangle(SKETCH3_W, SKETCH3_H)
    extrude(amount=BOSS_EXTRUDE2_4_DEPTH + BOSS_EXTRUDE2_4_DEPTH_BACK)


with BuildPart() as part_1:
    add(part.part)

    add(cirpattern1_1.part)  # Boss-Extrude3 merges CirPattern1_1

    add(cirpattern1_2.part)  # Boss-Extrude3 merges CirPattern1_2

    add(body_5.part)  # Boss-Extrude3 merges body 5

    add(body_6.part)  # Boss-Extrude3 merges body 6

    add(body_7.part)  # Boss-Extrude3 merges body 7

    add(body_8.part)  # Boss-Extrude3 merges body 8

    add(body_9.part)  # Boss-Extrude3 merges body 9

    add(body_10.part)  # Boss-Extrude3 merges body 10

    add(body_11.part)  # Boss-Extrude3 merges body 11

    add(body_12.part)  # Boss-Extrude3 merges body 12
    # Sketch4 → Boss-Extrude3 (add)
    with BuildSketch(Plane.XZ.offset(50)):
        Rectangle(SKETCH4_W, SKETCH4_H)
        Rectangle(SKETCH4_W_2, SKETCH4_H_2, mode=Mode.SUBTRACT)
    extrude(amount=-BOSS_EXTRUDE3_DEPTH)

    add(cirpattern1_3.part)  # Boss-Extrude4 merges CirPattern1_3
    # Sketch5 → Boss-Extrude4 (add)
    with BuildSketch(Plane(origin=(0, 50, 0), x_dir=(1, 0, 0), z_dir=(0, 1, 0))):
        Rectangle(SKETCH5_W, SKETCH5_H)
        Rectangle(SKETCH5_W_2, SKETCH5_H_2, mode=Mode.SUBTRACT)
    extrude(amount=-BOSS_EXTRUDE4_DEPTH)

    # Sketch7 → Cut-Extrude2 (cut)
    with BuildSketch(Plane.XZ.offset(43)):
        with Locations(Location((0, 0, 0), (0, 0, 270))):
            Circle(SKETCH7_R)
    extrude(amount=-CUT_EXTRUDE2_DEPTH, mode=Mode.SUBTRACT)

    # Sketch8 → Cut-Extrude3 (cut, through all)
    with BuildSketch(Plane.ZY.offset(43)):
        Circle(SKETCH8_R)
    extrude(amount=-CUT_EXTRUDE3_DEPTH, mode=Mode.SUBTRACT)

    # Sketch9 → Cut-Extrude4 (cut, through all)
    with BuildSketch(Plane(origin=(0, 0, -43), x_dir=(-1, 0, 0), z_dir=(0, 0, -1))):
        Circle(SKETCH9_R)
    extrude(amount=-CUT_EXTRUDE4_DEPTH, mode=Mode.SUBTRACT)

    # Sketch10 → Cut-Extrude5 (cut)
    with BuildSketch(Plane.XZ.offset(50)):
        Rectangle(SKETCH10_W, SKETCH10_H)
    extrude(amount=-CUT_EXTRUDE5_DEPTH, mode=Mode.SUBTRACT)

    # Sketch11 → Cut-Extrude6 (cut)
    with BuildSketch(Plane.ZY.offset(50)):
        with Locations((0, 1.5)):
            Rectangle(SKETCH11_W, SKETCH11_H)
    extrude(amount=-CUT_EXTRUDE6_DEPTH, mode=Mode.SUBTRACT)

    # Sketch12 → Cut-Extrude7 (cut)
    with BuildSketch(Plane.XY.offset(50)):
        with Locations((0.5, 1.5)):
            Rectangle(SKETCH12_W, SKETCH12_H)
    extrude(amount=-CUT_EXTRUDE7_DEPTH, mode=Mode.SUBTRACT)

    # Sketch13 → Cut-Extrude8 (cut)
    with BuildSketch(Plane(origin=(50, 0, 0), x_dir=(0, 0, -1), z_dir=(1, 0, 0))):
        with Locations((0.5, 1.5)):
            Rectangle(SKETCH13_W, SKETCH13_H)
    extrude(amount=-CUT_EXTRUDE8_DEPTH, mode=Mode.SUBTRACT)

    # Sketch14 → Cut-Extrude9 (cut)
    with BuildSketch(Plane(origin=(0, 0, -50), x_dir=(-1, 0, 0), z_dir=(0, 0, -1))):
        with Locations((0, 1.5)):
            Rectangle(SKETCH14_W, SKETCH14_H)
    extrude(amount=-CUT_EXTRUDE9_DEPTH, mode=Mode.SUBTRACT)

    # Sketch16 → Cut-Extrude10 (cut)
    with BuildSketch(Plane.XZ.offset(-40)):
        Rectangle(SKETCH16_W, SKETCH16_H)
    extrude(amount=-CUT_EXTRUDE10_DEPTH, mode=Mode.SUBTRACT)

    # Sketch17 → Cut-Extrude11 (cut)
    with BuildSketch(Plane(origin=(0, 40, 0), x_dir=(1, 0, 0), z_dir=(0, 1, 0))):
        with Locations(Location((44.5, 44.5, 0), (0, 0, 270))):
            Circle(SKETCH17_R)
        with Locations(Location((44.5, -44.5, 0), (0, 0, 270))):
            Circle(SKETCH17_R)
        with Locations(Location((-44.5, -44.5, 0), (0, 0, 270))):
            Circle(SKETCH17_R)
        with Locations(Location((-44.5, 44.5, 0), (0, 0, 270))):
            Circle(SKETCH17_R)
    extrude(amount=-CUT_EXTRUDE11_DEPTH, mode=Mode.SUBTRACT)

    # Sketch18 → Cut-Extrude14 (cut, through all)
    with BuildSketch(Plane(origin=(43, 0, 0), x_dir=(0, 0, -1), z_dir=(1, 0, 0))):
        with BuildLine():
            Line((-5, 40), (-5, 16.74259435))
            ThreePointArc((-5, 16.74259435), (0, 17.47325), (5, 16.74259435))
            Line((5, 16.74259435), (5, 40))
            Line((5, 40), (-5, 40))
        make_face()
        with BuildLine():
            Line((5, -40), (5, -16.74259435))
            ThreePointArc((5, -16.74259435), (0, -17.47325), (-5, -16.74259435))
            Line((-5, -16.74259435), (-5, -40))
            Line((-5, -40), (5, -40))
        make_face()
    extrude(amount=-CUT_EXTRUDE14_DEPTH, mode=Mode.SUBTRACT)


solid = part_1.part
